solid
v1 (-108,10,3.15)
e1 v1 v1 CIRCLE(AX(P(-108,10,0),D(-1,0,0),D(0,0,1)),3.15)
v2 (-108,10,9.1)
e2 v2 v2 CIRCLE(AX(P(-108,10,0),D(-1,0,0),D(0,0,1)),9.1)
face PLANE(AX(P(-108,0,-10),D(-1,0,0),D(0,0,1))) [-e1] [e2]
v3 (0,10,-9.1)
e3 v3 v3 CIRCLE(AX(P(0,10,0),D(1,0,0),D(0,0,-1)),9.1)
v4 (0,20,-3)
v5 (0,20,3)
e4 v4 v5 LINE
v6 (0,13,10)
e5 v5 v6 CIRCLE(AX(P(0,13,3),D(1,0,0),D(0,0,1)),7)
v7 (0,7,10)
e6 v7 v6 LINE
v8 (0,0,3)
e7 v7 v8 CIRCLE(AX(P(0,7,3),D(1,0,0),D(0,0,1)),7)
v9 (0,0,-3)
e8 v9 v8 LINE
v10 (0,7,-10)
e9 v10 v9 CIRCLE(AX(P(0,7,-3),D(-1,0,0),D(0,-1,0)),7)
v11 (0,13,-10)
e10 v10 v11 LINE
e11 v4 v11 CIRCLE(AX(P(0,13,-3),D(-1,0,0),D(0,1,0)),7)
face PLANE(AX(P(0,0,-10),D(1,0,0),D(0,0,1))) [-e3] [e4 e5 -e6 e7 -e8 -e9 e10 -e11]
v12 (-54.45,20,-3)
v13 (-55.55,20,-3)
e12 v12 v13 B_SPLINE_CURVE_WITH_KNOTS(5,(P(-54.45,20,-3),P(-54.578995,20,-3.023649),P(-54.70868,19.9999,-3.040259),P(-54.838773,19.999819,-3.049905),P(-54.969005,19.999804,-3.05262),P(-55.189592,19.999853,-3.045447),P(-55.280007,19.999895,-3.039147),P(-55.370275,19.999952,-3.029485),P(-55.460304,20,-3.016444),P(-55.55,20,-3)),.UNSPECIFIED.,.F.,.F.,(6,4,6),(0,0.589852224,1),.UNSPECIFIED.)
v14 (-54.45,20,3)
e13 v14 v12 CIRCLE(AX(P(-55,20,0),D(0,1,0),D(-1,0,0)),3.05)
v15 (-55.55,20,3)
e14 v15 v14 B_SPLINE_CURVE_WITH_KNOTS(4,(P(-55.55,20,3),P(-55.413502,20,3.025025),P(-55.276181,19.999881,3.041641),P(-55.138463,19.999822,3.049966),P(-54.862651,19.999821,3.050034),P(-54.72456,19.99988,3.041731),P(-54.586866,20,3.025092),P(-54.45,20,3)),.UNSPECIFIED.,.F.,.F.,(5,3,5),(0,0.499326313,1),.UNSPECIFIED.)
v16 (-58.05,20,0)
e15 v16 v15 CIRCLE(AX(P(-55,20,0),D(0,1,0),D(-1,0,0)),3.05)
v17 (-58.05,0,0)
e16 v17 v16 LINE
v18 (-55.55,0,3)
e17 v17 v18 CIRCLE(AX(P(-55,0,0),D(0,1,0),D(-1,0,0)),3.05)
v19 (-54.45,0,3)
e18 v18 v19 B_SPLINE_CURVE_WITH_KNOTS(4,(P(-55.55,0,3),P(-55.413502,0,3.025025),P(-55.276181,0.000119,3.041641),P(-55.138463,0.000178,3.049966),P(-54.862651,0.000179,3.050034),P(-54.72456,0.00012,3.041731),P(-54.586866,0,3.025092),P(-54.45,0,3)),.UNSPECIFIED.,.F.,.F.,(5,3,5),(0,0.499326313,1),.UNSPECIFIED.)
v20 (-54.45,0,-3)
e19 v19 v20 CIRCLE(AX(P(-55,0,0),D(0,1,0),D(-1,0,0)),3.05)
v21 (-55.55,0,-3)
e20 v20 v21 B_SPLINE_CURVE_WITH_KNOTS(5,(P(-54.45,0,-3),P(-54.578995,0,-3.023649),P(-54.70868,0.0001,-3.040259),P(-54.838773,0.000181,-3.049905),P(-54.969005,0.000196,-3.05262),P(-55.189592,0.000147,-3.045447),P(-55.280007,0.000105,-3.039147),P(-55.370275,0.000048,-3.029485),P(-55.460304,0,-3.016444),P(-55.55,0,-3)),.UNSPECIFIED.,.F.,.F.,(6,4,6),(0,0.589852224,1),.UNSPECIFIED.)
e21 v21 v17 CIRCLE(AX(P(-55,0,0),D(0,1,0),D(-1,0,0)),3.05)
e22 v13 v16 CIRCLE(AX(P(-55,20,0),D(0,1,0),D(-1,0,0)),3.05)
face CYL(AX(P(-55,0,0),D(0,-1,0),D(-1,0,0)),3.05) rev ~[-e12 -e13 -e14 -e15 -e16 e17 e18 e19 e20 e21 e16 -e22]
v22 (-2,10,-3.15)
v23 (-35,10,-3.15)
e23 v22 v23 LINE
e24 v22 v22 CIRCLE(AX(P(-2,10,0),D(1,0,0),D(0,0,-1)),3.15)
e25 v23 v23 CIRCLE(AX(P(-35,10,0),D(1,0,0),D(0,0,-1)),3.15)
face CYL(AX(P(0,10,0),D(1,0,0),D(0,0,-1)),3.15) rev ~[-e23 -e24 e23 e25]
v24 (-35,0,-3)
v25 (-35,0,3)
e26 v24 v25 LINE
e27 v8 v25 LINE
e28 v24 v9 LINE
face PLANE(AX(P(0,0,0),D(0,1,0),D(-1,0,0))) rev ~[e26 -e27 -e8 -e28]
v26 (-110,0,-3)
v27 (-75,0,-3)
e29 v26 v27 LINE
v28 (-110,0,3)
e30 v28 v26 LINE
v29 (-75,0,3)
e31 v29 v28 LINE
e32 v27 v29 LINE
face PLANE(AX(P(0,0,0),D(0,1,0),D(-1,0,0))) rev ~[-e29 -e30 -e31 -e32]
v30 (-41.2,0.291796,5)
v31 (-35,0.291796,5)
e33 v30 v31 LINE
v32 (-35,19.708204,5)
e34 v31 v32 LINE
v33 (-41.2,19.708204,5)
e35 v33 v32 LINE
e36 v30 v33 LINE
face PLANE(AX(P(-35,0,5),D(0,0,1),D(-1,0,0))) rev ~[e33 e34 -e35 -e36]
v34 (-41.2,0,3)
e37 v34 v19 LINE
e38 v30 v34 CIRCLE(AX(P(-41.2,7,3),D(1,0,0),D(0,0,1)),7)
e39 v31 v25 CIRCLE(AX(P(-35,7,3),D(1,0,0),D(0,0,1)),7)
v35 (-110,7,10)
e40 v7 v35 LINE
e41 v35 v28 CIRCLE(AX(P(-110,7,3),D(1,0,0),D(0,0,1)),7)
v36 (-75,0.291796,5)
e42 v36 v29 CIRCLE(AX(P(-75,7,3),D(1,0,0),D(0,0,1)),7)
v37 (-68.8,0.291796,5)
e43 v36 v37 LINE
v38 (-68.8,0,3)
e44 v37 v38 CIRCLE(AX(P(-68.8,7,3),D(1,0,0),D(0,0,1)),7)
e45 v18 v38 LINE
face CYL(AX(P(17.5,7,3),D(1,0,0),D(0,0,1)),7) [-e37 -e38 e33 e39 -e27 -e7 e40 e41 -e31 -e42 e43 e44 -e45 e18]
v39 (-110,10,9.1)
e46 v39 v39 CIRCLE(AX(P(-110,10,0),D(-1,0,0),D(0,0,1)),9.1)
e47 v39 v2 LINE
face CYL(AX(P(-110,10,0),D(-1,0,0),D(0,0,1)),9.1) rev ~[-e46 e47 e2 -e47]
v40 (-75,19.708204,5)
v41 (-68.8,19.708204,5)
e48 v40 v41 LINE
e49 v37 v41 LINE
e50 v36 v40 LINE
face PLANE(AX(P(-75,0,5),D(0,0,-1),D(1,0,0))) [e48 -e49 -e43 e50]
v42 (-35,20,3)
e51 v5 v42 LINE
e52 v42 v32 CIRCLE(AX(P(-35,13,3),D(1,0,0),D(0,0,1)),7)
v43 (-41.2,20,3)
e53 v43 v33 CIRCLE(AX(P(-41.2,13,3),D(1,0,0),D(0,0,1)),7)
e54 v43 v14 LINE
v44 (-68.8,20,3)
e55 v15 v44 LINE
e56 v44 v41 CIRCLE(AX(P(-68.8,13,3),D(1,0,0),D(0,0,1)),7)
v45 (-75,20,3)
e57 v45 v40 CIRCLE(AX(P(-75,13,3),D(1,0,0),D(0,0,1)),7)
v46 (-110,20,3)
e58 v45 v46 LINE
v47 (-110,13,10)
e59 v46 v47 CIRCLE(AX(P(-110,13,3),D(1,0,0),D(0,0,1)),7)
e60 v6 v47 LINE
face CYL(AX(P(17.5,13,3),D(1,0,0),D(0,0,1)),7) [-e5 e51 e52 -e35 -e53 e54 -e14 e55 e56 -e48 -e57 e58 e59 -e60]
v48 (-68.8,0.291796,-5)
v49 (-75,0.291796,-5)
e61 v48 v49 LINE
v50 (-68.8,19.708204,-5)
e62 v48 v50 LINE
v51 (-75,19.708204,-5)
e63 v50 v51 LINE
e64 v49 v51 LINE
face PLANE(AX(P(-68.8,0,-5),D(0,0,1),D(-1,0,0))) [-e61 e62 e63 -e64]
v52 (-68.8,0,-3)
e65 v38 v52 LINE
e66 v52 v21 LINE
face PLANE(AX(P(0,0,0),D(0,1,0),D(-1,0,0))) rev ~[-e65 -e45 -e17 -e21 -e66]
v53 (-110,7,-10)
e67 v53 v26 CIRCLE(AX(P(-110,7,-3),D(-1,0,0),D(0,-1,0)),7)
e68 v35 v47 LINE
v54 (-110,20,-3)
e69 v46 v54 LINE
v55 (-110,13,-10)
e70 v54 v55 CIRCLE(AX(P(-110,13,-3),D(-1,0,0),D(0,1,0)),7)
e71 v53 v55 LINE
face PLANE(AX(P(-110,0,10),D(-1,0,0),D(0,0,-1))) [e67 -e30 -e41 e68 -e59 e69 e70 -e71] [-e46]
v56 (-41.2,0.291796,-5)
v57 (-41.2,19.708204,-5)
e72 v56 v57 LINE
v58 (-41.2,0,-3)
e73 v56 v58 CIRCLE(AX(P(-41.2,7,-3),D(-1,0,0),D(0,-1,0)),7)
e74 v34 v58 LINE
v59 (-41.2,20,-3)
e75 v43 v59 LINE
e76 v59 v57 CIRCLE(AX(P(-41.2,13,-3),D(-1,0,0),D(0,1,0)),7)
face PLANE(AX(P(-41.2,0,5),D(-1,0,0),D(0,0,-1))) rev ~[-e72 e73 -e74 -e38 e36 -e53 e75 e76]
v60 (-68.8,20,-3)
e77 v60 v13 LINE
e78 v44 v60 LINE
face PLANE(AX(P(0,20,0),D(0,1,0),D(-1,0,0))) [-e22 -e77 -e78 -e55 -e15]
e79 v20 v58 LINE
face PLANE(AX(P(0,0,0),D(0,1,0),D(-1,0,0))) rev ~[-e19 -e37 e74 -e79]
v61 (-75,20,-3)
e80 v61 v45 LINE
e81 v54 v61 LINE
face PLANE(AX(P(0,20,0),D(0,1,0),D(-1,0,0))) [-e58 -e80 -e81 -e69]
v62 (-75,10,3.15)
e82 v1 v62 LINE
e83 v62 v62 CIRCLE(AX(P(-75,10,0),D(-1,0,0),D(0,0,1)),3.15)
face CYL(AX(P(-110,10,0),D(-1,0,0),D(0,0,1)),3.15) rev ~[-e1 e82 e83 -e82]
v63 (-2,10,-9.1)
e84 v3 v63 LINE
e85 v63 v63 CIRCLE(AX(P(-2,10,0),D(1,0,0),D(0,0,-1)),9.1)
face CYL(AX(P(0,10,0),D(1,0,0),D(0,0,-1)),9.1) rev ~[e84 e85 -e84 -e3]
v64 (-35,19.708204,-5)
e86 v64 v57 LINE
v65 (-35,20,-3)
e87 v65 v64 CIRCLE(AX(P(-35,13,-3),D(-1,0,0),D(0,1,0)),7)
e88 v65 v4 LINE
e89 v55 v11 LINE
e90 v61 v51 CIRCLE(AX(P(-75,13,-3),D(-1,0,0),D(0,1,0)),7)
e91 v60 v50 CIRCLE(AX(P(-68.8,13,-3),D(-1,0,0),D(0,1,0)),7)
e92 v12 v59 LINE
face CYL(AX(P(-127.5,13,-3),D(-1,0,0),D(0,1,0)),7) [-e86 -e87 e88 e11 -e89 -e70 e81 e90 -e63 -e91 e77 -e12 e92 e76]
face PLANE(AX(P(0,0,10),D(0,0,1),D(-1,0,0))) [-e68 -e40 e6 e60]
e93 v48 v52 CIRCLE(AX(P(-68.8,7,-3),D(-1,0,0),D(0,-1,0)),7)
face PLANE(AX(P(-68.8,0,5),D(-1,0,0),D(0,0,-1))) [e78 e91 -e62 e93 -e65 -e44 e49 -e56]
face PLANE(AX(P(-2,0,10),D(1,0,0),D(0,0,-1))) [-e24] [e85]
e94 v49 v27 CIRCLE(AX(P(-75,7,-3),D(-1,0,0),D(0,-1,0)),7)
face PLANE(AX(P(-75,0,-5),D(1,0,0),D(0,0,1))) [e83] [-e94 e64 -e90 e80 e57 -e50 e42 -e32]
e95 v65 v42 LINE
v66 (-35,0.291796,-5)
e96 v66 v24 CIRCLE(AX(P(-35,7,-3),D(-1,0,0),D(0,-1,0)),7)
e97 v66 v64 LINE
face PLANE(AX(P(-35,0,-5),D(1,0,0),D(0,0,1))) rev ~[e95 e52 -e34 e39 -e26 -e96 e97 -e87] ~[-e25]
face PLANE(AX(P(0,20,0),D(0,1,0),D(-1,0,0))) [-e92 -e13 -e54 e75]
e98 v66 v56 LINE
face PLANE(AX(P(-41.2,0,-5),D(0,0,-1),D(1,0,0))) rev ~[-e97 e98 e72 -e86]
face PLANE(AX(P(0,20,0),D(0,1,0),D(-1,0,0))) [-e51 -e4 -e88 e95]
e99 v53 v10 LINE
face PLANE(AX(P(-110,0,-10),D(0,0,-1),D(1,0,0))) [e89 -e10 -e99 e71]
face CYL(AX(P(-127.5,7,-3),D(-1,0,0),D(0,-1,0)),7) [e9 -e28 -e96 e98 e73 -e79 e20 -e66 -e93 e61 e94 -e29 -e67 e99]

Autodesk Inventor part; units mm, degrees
ref_plane "YZ Plane" through (0, 0, 0) normal (1, 0, 0) x (0, 1, 0)
ref_plane "XZ Plane" through (0, 0, 0) normal (0, 1, 0) x (-1, 0, 0)
ref_plane "XY Plane" through (0, 0, 0) normal (0, 0, 1) x (1, 0, 0)
sketch "Boceto1" plane through (0, 0, 0) normal (0, 1, 0) x (-1, 0, 0)
  line L0 (0, 10) -> (110, 10)
  line L1 (110, 10) -> (110, -10)
  line L2 (110, -10) -> (0, -10)
  line L3 (0, -10) -> (0, 10)
  line L4 (0, 0) -> (110, 0) construction
  line L5 (68.8, -5) -> (75, -5)
  line L6 (75, -5) -> (75, 5)
  line L7 (75, 5) -> (68.8, 5)
  line L8 (68.8, 5) -> (68.8, -5)
  line L9 (71.9, -5) -> (71.9, -10) construction
  line L10 (71.9, 5) -> (71.9, 10) construction
  line L11 (55, -10) -> (55, 10) construction
  line L12 (41.2, -5) -> (35, -5)
  line L13 (35, -5) -> (35, 5)
  line L14 (35, 5) -> (41.2, 5)
  line L15 (41.2, 5) -> (41.2, -5)
  line L16 (58.6062, -3.6062) -> (51.3938, -3.6062) construction
  line L17 (51.3938, -3.6062) -> (51.3938, 3.6062) construction
  line L18 (51.3938, 3.6062) -> (58.6062, 3.6062) construction
  line L19 (58.6062, 3.6062) -> (58.6062, -3.6062) construction
  circle A0 centre (55, 0) radius 4 construction
  circle A1 centre (55, 0) radius 3.05
  circle A2 centre (55, 0) radius 5.1 construction
  dimension "d28" = 10.2
  dimension "d6" = 110
  dimension "d10" = 10
  dimension "d12" = 5
  dimension "d13" = 20
  dimension "d16" = 6.2
  dimension "d18" = 8
  dimension "d19" = 35
  dimension "d27" = 6.1
extrude "Extrusión1" add sketch "Boceto1" along normal blind 20
sketch "Boceto3" plane through (-110, 0, -10) normal (-1, 0, 0) x (0, 0, 1)
  circle A0 centre (10, 10) radius 3.15
  line L0 (20, 20) -> (0, 20) construction
  line L1 (0, 20) -> (20, 0) construction
  line L2 (0, 0) -> (20, 0) construction
  line L3 (20, 20) -> (0, 0) construction
  point P0 (10, 0)
  dimension "d4" = 6.3
extrude "Extrusión2" cut sketch "Boceto3" against normal up to next
sketch "Boceto5" plane through (-110, 0, -10) normal (-1, 0, 0) x (0, 0, 1)
  circle A0 centre (10, 10) radius 3.15 projected
  circle A1 centre (10, 10) radius 9.1
  point P0 (10, 0)
  dimension "d8" = 18.2
extrude "Extrusión3" cut sketch "Boceto5" against normal blind 2
sketch "Boceto6" plane through (0, 0, 10) normal (1, 0, 0) x (0, 0, -1)
  circle A0 centre (10, 10) radius 3.15 projected
  circle A1 centre (10, 10) radius 9.1 projected
  point P0 (10, 0)
extrude "Extrusión4" cut sketch "Boceto6" against normal up to next contours A0
sketch "Boceto7" plane through (0, 0, 10) normal (1, 0, 0) x (0, 0, -1)
  circle A0 centre (10, 10) radius 9.1 projected
  point P0 (10, 0)
extrude "Extrusión5" cut sketch "Boceto7" against normal blind 2
fillet "Empalme1" radius 7 4 edges at (-55, 0, 10) (-55, 0, -10) (-55, 20, -10) (-55, 20, 10)
